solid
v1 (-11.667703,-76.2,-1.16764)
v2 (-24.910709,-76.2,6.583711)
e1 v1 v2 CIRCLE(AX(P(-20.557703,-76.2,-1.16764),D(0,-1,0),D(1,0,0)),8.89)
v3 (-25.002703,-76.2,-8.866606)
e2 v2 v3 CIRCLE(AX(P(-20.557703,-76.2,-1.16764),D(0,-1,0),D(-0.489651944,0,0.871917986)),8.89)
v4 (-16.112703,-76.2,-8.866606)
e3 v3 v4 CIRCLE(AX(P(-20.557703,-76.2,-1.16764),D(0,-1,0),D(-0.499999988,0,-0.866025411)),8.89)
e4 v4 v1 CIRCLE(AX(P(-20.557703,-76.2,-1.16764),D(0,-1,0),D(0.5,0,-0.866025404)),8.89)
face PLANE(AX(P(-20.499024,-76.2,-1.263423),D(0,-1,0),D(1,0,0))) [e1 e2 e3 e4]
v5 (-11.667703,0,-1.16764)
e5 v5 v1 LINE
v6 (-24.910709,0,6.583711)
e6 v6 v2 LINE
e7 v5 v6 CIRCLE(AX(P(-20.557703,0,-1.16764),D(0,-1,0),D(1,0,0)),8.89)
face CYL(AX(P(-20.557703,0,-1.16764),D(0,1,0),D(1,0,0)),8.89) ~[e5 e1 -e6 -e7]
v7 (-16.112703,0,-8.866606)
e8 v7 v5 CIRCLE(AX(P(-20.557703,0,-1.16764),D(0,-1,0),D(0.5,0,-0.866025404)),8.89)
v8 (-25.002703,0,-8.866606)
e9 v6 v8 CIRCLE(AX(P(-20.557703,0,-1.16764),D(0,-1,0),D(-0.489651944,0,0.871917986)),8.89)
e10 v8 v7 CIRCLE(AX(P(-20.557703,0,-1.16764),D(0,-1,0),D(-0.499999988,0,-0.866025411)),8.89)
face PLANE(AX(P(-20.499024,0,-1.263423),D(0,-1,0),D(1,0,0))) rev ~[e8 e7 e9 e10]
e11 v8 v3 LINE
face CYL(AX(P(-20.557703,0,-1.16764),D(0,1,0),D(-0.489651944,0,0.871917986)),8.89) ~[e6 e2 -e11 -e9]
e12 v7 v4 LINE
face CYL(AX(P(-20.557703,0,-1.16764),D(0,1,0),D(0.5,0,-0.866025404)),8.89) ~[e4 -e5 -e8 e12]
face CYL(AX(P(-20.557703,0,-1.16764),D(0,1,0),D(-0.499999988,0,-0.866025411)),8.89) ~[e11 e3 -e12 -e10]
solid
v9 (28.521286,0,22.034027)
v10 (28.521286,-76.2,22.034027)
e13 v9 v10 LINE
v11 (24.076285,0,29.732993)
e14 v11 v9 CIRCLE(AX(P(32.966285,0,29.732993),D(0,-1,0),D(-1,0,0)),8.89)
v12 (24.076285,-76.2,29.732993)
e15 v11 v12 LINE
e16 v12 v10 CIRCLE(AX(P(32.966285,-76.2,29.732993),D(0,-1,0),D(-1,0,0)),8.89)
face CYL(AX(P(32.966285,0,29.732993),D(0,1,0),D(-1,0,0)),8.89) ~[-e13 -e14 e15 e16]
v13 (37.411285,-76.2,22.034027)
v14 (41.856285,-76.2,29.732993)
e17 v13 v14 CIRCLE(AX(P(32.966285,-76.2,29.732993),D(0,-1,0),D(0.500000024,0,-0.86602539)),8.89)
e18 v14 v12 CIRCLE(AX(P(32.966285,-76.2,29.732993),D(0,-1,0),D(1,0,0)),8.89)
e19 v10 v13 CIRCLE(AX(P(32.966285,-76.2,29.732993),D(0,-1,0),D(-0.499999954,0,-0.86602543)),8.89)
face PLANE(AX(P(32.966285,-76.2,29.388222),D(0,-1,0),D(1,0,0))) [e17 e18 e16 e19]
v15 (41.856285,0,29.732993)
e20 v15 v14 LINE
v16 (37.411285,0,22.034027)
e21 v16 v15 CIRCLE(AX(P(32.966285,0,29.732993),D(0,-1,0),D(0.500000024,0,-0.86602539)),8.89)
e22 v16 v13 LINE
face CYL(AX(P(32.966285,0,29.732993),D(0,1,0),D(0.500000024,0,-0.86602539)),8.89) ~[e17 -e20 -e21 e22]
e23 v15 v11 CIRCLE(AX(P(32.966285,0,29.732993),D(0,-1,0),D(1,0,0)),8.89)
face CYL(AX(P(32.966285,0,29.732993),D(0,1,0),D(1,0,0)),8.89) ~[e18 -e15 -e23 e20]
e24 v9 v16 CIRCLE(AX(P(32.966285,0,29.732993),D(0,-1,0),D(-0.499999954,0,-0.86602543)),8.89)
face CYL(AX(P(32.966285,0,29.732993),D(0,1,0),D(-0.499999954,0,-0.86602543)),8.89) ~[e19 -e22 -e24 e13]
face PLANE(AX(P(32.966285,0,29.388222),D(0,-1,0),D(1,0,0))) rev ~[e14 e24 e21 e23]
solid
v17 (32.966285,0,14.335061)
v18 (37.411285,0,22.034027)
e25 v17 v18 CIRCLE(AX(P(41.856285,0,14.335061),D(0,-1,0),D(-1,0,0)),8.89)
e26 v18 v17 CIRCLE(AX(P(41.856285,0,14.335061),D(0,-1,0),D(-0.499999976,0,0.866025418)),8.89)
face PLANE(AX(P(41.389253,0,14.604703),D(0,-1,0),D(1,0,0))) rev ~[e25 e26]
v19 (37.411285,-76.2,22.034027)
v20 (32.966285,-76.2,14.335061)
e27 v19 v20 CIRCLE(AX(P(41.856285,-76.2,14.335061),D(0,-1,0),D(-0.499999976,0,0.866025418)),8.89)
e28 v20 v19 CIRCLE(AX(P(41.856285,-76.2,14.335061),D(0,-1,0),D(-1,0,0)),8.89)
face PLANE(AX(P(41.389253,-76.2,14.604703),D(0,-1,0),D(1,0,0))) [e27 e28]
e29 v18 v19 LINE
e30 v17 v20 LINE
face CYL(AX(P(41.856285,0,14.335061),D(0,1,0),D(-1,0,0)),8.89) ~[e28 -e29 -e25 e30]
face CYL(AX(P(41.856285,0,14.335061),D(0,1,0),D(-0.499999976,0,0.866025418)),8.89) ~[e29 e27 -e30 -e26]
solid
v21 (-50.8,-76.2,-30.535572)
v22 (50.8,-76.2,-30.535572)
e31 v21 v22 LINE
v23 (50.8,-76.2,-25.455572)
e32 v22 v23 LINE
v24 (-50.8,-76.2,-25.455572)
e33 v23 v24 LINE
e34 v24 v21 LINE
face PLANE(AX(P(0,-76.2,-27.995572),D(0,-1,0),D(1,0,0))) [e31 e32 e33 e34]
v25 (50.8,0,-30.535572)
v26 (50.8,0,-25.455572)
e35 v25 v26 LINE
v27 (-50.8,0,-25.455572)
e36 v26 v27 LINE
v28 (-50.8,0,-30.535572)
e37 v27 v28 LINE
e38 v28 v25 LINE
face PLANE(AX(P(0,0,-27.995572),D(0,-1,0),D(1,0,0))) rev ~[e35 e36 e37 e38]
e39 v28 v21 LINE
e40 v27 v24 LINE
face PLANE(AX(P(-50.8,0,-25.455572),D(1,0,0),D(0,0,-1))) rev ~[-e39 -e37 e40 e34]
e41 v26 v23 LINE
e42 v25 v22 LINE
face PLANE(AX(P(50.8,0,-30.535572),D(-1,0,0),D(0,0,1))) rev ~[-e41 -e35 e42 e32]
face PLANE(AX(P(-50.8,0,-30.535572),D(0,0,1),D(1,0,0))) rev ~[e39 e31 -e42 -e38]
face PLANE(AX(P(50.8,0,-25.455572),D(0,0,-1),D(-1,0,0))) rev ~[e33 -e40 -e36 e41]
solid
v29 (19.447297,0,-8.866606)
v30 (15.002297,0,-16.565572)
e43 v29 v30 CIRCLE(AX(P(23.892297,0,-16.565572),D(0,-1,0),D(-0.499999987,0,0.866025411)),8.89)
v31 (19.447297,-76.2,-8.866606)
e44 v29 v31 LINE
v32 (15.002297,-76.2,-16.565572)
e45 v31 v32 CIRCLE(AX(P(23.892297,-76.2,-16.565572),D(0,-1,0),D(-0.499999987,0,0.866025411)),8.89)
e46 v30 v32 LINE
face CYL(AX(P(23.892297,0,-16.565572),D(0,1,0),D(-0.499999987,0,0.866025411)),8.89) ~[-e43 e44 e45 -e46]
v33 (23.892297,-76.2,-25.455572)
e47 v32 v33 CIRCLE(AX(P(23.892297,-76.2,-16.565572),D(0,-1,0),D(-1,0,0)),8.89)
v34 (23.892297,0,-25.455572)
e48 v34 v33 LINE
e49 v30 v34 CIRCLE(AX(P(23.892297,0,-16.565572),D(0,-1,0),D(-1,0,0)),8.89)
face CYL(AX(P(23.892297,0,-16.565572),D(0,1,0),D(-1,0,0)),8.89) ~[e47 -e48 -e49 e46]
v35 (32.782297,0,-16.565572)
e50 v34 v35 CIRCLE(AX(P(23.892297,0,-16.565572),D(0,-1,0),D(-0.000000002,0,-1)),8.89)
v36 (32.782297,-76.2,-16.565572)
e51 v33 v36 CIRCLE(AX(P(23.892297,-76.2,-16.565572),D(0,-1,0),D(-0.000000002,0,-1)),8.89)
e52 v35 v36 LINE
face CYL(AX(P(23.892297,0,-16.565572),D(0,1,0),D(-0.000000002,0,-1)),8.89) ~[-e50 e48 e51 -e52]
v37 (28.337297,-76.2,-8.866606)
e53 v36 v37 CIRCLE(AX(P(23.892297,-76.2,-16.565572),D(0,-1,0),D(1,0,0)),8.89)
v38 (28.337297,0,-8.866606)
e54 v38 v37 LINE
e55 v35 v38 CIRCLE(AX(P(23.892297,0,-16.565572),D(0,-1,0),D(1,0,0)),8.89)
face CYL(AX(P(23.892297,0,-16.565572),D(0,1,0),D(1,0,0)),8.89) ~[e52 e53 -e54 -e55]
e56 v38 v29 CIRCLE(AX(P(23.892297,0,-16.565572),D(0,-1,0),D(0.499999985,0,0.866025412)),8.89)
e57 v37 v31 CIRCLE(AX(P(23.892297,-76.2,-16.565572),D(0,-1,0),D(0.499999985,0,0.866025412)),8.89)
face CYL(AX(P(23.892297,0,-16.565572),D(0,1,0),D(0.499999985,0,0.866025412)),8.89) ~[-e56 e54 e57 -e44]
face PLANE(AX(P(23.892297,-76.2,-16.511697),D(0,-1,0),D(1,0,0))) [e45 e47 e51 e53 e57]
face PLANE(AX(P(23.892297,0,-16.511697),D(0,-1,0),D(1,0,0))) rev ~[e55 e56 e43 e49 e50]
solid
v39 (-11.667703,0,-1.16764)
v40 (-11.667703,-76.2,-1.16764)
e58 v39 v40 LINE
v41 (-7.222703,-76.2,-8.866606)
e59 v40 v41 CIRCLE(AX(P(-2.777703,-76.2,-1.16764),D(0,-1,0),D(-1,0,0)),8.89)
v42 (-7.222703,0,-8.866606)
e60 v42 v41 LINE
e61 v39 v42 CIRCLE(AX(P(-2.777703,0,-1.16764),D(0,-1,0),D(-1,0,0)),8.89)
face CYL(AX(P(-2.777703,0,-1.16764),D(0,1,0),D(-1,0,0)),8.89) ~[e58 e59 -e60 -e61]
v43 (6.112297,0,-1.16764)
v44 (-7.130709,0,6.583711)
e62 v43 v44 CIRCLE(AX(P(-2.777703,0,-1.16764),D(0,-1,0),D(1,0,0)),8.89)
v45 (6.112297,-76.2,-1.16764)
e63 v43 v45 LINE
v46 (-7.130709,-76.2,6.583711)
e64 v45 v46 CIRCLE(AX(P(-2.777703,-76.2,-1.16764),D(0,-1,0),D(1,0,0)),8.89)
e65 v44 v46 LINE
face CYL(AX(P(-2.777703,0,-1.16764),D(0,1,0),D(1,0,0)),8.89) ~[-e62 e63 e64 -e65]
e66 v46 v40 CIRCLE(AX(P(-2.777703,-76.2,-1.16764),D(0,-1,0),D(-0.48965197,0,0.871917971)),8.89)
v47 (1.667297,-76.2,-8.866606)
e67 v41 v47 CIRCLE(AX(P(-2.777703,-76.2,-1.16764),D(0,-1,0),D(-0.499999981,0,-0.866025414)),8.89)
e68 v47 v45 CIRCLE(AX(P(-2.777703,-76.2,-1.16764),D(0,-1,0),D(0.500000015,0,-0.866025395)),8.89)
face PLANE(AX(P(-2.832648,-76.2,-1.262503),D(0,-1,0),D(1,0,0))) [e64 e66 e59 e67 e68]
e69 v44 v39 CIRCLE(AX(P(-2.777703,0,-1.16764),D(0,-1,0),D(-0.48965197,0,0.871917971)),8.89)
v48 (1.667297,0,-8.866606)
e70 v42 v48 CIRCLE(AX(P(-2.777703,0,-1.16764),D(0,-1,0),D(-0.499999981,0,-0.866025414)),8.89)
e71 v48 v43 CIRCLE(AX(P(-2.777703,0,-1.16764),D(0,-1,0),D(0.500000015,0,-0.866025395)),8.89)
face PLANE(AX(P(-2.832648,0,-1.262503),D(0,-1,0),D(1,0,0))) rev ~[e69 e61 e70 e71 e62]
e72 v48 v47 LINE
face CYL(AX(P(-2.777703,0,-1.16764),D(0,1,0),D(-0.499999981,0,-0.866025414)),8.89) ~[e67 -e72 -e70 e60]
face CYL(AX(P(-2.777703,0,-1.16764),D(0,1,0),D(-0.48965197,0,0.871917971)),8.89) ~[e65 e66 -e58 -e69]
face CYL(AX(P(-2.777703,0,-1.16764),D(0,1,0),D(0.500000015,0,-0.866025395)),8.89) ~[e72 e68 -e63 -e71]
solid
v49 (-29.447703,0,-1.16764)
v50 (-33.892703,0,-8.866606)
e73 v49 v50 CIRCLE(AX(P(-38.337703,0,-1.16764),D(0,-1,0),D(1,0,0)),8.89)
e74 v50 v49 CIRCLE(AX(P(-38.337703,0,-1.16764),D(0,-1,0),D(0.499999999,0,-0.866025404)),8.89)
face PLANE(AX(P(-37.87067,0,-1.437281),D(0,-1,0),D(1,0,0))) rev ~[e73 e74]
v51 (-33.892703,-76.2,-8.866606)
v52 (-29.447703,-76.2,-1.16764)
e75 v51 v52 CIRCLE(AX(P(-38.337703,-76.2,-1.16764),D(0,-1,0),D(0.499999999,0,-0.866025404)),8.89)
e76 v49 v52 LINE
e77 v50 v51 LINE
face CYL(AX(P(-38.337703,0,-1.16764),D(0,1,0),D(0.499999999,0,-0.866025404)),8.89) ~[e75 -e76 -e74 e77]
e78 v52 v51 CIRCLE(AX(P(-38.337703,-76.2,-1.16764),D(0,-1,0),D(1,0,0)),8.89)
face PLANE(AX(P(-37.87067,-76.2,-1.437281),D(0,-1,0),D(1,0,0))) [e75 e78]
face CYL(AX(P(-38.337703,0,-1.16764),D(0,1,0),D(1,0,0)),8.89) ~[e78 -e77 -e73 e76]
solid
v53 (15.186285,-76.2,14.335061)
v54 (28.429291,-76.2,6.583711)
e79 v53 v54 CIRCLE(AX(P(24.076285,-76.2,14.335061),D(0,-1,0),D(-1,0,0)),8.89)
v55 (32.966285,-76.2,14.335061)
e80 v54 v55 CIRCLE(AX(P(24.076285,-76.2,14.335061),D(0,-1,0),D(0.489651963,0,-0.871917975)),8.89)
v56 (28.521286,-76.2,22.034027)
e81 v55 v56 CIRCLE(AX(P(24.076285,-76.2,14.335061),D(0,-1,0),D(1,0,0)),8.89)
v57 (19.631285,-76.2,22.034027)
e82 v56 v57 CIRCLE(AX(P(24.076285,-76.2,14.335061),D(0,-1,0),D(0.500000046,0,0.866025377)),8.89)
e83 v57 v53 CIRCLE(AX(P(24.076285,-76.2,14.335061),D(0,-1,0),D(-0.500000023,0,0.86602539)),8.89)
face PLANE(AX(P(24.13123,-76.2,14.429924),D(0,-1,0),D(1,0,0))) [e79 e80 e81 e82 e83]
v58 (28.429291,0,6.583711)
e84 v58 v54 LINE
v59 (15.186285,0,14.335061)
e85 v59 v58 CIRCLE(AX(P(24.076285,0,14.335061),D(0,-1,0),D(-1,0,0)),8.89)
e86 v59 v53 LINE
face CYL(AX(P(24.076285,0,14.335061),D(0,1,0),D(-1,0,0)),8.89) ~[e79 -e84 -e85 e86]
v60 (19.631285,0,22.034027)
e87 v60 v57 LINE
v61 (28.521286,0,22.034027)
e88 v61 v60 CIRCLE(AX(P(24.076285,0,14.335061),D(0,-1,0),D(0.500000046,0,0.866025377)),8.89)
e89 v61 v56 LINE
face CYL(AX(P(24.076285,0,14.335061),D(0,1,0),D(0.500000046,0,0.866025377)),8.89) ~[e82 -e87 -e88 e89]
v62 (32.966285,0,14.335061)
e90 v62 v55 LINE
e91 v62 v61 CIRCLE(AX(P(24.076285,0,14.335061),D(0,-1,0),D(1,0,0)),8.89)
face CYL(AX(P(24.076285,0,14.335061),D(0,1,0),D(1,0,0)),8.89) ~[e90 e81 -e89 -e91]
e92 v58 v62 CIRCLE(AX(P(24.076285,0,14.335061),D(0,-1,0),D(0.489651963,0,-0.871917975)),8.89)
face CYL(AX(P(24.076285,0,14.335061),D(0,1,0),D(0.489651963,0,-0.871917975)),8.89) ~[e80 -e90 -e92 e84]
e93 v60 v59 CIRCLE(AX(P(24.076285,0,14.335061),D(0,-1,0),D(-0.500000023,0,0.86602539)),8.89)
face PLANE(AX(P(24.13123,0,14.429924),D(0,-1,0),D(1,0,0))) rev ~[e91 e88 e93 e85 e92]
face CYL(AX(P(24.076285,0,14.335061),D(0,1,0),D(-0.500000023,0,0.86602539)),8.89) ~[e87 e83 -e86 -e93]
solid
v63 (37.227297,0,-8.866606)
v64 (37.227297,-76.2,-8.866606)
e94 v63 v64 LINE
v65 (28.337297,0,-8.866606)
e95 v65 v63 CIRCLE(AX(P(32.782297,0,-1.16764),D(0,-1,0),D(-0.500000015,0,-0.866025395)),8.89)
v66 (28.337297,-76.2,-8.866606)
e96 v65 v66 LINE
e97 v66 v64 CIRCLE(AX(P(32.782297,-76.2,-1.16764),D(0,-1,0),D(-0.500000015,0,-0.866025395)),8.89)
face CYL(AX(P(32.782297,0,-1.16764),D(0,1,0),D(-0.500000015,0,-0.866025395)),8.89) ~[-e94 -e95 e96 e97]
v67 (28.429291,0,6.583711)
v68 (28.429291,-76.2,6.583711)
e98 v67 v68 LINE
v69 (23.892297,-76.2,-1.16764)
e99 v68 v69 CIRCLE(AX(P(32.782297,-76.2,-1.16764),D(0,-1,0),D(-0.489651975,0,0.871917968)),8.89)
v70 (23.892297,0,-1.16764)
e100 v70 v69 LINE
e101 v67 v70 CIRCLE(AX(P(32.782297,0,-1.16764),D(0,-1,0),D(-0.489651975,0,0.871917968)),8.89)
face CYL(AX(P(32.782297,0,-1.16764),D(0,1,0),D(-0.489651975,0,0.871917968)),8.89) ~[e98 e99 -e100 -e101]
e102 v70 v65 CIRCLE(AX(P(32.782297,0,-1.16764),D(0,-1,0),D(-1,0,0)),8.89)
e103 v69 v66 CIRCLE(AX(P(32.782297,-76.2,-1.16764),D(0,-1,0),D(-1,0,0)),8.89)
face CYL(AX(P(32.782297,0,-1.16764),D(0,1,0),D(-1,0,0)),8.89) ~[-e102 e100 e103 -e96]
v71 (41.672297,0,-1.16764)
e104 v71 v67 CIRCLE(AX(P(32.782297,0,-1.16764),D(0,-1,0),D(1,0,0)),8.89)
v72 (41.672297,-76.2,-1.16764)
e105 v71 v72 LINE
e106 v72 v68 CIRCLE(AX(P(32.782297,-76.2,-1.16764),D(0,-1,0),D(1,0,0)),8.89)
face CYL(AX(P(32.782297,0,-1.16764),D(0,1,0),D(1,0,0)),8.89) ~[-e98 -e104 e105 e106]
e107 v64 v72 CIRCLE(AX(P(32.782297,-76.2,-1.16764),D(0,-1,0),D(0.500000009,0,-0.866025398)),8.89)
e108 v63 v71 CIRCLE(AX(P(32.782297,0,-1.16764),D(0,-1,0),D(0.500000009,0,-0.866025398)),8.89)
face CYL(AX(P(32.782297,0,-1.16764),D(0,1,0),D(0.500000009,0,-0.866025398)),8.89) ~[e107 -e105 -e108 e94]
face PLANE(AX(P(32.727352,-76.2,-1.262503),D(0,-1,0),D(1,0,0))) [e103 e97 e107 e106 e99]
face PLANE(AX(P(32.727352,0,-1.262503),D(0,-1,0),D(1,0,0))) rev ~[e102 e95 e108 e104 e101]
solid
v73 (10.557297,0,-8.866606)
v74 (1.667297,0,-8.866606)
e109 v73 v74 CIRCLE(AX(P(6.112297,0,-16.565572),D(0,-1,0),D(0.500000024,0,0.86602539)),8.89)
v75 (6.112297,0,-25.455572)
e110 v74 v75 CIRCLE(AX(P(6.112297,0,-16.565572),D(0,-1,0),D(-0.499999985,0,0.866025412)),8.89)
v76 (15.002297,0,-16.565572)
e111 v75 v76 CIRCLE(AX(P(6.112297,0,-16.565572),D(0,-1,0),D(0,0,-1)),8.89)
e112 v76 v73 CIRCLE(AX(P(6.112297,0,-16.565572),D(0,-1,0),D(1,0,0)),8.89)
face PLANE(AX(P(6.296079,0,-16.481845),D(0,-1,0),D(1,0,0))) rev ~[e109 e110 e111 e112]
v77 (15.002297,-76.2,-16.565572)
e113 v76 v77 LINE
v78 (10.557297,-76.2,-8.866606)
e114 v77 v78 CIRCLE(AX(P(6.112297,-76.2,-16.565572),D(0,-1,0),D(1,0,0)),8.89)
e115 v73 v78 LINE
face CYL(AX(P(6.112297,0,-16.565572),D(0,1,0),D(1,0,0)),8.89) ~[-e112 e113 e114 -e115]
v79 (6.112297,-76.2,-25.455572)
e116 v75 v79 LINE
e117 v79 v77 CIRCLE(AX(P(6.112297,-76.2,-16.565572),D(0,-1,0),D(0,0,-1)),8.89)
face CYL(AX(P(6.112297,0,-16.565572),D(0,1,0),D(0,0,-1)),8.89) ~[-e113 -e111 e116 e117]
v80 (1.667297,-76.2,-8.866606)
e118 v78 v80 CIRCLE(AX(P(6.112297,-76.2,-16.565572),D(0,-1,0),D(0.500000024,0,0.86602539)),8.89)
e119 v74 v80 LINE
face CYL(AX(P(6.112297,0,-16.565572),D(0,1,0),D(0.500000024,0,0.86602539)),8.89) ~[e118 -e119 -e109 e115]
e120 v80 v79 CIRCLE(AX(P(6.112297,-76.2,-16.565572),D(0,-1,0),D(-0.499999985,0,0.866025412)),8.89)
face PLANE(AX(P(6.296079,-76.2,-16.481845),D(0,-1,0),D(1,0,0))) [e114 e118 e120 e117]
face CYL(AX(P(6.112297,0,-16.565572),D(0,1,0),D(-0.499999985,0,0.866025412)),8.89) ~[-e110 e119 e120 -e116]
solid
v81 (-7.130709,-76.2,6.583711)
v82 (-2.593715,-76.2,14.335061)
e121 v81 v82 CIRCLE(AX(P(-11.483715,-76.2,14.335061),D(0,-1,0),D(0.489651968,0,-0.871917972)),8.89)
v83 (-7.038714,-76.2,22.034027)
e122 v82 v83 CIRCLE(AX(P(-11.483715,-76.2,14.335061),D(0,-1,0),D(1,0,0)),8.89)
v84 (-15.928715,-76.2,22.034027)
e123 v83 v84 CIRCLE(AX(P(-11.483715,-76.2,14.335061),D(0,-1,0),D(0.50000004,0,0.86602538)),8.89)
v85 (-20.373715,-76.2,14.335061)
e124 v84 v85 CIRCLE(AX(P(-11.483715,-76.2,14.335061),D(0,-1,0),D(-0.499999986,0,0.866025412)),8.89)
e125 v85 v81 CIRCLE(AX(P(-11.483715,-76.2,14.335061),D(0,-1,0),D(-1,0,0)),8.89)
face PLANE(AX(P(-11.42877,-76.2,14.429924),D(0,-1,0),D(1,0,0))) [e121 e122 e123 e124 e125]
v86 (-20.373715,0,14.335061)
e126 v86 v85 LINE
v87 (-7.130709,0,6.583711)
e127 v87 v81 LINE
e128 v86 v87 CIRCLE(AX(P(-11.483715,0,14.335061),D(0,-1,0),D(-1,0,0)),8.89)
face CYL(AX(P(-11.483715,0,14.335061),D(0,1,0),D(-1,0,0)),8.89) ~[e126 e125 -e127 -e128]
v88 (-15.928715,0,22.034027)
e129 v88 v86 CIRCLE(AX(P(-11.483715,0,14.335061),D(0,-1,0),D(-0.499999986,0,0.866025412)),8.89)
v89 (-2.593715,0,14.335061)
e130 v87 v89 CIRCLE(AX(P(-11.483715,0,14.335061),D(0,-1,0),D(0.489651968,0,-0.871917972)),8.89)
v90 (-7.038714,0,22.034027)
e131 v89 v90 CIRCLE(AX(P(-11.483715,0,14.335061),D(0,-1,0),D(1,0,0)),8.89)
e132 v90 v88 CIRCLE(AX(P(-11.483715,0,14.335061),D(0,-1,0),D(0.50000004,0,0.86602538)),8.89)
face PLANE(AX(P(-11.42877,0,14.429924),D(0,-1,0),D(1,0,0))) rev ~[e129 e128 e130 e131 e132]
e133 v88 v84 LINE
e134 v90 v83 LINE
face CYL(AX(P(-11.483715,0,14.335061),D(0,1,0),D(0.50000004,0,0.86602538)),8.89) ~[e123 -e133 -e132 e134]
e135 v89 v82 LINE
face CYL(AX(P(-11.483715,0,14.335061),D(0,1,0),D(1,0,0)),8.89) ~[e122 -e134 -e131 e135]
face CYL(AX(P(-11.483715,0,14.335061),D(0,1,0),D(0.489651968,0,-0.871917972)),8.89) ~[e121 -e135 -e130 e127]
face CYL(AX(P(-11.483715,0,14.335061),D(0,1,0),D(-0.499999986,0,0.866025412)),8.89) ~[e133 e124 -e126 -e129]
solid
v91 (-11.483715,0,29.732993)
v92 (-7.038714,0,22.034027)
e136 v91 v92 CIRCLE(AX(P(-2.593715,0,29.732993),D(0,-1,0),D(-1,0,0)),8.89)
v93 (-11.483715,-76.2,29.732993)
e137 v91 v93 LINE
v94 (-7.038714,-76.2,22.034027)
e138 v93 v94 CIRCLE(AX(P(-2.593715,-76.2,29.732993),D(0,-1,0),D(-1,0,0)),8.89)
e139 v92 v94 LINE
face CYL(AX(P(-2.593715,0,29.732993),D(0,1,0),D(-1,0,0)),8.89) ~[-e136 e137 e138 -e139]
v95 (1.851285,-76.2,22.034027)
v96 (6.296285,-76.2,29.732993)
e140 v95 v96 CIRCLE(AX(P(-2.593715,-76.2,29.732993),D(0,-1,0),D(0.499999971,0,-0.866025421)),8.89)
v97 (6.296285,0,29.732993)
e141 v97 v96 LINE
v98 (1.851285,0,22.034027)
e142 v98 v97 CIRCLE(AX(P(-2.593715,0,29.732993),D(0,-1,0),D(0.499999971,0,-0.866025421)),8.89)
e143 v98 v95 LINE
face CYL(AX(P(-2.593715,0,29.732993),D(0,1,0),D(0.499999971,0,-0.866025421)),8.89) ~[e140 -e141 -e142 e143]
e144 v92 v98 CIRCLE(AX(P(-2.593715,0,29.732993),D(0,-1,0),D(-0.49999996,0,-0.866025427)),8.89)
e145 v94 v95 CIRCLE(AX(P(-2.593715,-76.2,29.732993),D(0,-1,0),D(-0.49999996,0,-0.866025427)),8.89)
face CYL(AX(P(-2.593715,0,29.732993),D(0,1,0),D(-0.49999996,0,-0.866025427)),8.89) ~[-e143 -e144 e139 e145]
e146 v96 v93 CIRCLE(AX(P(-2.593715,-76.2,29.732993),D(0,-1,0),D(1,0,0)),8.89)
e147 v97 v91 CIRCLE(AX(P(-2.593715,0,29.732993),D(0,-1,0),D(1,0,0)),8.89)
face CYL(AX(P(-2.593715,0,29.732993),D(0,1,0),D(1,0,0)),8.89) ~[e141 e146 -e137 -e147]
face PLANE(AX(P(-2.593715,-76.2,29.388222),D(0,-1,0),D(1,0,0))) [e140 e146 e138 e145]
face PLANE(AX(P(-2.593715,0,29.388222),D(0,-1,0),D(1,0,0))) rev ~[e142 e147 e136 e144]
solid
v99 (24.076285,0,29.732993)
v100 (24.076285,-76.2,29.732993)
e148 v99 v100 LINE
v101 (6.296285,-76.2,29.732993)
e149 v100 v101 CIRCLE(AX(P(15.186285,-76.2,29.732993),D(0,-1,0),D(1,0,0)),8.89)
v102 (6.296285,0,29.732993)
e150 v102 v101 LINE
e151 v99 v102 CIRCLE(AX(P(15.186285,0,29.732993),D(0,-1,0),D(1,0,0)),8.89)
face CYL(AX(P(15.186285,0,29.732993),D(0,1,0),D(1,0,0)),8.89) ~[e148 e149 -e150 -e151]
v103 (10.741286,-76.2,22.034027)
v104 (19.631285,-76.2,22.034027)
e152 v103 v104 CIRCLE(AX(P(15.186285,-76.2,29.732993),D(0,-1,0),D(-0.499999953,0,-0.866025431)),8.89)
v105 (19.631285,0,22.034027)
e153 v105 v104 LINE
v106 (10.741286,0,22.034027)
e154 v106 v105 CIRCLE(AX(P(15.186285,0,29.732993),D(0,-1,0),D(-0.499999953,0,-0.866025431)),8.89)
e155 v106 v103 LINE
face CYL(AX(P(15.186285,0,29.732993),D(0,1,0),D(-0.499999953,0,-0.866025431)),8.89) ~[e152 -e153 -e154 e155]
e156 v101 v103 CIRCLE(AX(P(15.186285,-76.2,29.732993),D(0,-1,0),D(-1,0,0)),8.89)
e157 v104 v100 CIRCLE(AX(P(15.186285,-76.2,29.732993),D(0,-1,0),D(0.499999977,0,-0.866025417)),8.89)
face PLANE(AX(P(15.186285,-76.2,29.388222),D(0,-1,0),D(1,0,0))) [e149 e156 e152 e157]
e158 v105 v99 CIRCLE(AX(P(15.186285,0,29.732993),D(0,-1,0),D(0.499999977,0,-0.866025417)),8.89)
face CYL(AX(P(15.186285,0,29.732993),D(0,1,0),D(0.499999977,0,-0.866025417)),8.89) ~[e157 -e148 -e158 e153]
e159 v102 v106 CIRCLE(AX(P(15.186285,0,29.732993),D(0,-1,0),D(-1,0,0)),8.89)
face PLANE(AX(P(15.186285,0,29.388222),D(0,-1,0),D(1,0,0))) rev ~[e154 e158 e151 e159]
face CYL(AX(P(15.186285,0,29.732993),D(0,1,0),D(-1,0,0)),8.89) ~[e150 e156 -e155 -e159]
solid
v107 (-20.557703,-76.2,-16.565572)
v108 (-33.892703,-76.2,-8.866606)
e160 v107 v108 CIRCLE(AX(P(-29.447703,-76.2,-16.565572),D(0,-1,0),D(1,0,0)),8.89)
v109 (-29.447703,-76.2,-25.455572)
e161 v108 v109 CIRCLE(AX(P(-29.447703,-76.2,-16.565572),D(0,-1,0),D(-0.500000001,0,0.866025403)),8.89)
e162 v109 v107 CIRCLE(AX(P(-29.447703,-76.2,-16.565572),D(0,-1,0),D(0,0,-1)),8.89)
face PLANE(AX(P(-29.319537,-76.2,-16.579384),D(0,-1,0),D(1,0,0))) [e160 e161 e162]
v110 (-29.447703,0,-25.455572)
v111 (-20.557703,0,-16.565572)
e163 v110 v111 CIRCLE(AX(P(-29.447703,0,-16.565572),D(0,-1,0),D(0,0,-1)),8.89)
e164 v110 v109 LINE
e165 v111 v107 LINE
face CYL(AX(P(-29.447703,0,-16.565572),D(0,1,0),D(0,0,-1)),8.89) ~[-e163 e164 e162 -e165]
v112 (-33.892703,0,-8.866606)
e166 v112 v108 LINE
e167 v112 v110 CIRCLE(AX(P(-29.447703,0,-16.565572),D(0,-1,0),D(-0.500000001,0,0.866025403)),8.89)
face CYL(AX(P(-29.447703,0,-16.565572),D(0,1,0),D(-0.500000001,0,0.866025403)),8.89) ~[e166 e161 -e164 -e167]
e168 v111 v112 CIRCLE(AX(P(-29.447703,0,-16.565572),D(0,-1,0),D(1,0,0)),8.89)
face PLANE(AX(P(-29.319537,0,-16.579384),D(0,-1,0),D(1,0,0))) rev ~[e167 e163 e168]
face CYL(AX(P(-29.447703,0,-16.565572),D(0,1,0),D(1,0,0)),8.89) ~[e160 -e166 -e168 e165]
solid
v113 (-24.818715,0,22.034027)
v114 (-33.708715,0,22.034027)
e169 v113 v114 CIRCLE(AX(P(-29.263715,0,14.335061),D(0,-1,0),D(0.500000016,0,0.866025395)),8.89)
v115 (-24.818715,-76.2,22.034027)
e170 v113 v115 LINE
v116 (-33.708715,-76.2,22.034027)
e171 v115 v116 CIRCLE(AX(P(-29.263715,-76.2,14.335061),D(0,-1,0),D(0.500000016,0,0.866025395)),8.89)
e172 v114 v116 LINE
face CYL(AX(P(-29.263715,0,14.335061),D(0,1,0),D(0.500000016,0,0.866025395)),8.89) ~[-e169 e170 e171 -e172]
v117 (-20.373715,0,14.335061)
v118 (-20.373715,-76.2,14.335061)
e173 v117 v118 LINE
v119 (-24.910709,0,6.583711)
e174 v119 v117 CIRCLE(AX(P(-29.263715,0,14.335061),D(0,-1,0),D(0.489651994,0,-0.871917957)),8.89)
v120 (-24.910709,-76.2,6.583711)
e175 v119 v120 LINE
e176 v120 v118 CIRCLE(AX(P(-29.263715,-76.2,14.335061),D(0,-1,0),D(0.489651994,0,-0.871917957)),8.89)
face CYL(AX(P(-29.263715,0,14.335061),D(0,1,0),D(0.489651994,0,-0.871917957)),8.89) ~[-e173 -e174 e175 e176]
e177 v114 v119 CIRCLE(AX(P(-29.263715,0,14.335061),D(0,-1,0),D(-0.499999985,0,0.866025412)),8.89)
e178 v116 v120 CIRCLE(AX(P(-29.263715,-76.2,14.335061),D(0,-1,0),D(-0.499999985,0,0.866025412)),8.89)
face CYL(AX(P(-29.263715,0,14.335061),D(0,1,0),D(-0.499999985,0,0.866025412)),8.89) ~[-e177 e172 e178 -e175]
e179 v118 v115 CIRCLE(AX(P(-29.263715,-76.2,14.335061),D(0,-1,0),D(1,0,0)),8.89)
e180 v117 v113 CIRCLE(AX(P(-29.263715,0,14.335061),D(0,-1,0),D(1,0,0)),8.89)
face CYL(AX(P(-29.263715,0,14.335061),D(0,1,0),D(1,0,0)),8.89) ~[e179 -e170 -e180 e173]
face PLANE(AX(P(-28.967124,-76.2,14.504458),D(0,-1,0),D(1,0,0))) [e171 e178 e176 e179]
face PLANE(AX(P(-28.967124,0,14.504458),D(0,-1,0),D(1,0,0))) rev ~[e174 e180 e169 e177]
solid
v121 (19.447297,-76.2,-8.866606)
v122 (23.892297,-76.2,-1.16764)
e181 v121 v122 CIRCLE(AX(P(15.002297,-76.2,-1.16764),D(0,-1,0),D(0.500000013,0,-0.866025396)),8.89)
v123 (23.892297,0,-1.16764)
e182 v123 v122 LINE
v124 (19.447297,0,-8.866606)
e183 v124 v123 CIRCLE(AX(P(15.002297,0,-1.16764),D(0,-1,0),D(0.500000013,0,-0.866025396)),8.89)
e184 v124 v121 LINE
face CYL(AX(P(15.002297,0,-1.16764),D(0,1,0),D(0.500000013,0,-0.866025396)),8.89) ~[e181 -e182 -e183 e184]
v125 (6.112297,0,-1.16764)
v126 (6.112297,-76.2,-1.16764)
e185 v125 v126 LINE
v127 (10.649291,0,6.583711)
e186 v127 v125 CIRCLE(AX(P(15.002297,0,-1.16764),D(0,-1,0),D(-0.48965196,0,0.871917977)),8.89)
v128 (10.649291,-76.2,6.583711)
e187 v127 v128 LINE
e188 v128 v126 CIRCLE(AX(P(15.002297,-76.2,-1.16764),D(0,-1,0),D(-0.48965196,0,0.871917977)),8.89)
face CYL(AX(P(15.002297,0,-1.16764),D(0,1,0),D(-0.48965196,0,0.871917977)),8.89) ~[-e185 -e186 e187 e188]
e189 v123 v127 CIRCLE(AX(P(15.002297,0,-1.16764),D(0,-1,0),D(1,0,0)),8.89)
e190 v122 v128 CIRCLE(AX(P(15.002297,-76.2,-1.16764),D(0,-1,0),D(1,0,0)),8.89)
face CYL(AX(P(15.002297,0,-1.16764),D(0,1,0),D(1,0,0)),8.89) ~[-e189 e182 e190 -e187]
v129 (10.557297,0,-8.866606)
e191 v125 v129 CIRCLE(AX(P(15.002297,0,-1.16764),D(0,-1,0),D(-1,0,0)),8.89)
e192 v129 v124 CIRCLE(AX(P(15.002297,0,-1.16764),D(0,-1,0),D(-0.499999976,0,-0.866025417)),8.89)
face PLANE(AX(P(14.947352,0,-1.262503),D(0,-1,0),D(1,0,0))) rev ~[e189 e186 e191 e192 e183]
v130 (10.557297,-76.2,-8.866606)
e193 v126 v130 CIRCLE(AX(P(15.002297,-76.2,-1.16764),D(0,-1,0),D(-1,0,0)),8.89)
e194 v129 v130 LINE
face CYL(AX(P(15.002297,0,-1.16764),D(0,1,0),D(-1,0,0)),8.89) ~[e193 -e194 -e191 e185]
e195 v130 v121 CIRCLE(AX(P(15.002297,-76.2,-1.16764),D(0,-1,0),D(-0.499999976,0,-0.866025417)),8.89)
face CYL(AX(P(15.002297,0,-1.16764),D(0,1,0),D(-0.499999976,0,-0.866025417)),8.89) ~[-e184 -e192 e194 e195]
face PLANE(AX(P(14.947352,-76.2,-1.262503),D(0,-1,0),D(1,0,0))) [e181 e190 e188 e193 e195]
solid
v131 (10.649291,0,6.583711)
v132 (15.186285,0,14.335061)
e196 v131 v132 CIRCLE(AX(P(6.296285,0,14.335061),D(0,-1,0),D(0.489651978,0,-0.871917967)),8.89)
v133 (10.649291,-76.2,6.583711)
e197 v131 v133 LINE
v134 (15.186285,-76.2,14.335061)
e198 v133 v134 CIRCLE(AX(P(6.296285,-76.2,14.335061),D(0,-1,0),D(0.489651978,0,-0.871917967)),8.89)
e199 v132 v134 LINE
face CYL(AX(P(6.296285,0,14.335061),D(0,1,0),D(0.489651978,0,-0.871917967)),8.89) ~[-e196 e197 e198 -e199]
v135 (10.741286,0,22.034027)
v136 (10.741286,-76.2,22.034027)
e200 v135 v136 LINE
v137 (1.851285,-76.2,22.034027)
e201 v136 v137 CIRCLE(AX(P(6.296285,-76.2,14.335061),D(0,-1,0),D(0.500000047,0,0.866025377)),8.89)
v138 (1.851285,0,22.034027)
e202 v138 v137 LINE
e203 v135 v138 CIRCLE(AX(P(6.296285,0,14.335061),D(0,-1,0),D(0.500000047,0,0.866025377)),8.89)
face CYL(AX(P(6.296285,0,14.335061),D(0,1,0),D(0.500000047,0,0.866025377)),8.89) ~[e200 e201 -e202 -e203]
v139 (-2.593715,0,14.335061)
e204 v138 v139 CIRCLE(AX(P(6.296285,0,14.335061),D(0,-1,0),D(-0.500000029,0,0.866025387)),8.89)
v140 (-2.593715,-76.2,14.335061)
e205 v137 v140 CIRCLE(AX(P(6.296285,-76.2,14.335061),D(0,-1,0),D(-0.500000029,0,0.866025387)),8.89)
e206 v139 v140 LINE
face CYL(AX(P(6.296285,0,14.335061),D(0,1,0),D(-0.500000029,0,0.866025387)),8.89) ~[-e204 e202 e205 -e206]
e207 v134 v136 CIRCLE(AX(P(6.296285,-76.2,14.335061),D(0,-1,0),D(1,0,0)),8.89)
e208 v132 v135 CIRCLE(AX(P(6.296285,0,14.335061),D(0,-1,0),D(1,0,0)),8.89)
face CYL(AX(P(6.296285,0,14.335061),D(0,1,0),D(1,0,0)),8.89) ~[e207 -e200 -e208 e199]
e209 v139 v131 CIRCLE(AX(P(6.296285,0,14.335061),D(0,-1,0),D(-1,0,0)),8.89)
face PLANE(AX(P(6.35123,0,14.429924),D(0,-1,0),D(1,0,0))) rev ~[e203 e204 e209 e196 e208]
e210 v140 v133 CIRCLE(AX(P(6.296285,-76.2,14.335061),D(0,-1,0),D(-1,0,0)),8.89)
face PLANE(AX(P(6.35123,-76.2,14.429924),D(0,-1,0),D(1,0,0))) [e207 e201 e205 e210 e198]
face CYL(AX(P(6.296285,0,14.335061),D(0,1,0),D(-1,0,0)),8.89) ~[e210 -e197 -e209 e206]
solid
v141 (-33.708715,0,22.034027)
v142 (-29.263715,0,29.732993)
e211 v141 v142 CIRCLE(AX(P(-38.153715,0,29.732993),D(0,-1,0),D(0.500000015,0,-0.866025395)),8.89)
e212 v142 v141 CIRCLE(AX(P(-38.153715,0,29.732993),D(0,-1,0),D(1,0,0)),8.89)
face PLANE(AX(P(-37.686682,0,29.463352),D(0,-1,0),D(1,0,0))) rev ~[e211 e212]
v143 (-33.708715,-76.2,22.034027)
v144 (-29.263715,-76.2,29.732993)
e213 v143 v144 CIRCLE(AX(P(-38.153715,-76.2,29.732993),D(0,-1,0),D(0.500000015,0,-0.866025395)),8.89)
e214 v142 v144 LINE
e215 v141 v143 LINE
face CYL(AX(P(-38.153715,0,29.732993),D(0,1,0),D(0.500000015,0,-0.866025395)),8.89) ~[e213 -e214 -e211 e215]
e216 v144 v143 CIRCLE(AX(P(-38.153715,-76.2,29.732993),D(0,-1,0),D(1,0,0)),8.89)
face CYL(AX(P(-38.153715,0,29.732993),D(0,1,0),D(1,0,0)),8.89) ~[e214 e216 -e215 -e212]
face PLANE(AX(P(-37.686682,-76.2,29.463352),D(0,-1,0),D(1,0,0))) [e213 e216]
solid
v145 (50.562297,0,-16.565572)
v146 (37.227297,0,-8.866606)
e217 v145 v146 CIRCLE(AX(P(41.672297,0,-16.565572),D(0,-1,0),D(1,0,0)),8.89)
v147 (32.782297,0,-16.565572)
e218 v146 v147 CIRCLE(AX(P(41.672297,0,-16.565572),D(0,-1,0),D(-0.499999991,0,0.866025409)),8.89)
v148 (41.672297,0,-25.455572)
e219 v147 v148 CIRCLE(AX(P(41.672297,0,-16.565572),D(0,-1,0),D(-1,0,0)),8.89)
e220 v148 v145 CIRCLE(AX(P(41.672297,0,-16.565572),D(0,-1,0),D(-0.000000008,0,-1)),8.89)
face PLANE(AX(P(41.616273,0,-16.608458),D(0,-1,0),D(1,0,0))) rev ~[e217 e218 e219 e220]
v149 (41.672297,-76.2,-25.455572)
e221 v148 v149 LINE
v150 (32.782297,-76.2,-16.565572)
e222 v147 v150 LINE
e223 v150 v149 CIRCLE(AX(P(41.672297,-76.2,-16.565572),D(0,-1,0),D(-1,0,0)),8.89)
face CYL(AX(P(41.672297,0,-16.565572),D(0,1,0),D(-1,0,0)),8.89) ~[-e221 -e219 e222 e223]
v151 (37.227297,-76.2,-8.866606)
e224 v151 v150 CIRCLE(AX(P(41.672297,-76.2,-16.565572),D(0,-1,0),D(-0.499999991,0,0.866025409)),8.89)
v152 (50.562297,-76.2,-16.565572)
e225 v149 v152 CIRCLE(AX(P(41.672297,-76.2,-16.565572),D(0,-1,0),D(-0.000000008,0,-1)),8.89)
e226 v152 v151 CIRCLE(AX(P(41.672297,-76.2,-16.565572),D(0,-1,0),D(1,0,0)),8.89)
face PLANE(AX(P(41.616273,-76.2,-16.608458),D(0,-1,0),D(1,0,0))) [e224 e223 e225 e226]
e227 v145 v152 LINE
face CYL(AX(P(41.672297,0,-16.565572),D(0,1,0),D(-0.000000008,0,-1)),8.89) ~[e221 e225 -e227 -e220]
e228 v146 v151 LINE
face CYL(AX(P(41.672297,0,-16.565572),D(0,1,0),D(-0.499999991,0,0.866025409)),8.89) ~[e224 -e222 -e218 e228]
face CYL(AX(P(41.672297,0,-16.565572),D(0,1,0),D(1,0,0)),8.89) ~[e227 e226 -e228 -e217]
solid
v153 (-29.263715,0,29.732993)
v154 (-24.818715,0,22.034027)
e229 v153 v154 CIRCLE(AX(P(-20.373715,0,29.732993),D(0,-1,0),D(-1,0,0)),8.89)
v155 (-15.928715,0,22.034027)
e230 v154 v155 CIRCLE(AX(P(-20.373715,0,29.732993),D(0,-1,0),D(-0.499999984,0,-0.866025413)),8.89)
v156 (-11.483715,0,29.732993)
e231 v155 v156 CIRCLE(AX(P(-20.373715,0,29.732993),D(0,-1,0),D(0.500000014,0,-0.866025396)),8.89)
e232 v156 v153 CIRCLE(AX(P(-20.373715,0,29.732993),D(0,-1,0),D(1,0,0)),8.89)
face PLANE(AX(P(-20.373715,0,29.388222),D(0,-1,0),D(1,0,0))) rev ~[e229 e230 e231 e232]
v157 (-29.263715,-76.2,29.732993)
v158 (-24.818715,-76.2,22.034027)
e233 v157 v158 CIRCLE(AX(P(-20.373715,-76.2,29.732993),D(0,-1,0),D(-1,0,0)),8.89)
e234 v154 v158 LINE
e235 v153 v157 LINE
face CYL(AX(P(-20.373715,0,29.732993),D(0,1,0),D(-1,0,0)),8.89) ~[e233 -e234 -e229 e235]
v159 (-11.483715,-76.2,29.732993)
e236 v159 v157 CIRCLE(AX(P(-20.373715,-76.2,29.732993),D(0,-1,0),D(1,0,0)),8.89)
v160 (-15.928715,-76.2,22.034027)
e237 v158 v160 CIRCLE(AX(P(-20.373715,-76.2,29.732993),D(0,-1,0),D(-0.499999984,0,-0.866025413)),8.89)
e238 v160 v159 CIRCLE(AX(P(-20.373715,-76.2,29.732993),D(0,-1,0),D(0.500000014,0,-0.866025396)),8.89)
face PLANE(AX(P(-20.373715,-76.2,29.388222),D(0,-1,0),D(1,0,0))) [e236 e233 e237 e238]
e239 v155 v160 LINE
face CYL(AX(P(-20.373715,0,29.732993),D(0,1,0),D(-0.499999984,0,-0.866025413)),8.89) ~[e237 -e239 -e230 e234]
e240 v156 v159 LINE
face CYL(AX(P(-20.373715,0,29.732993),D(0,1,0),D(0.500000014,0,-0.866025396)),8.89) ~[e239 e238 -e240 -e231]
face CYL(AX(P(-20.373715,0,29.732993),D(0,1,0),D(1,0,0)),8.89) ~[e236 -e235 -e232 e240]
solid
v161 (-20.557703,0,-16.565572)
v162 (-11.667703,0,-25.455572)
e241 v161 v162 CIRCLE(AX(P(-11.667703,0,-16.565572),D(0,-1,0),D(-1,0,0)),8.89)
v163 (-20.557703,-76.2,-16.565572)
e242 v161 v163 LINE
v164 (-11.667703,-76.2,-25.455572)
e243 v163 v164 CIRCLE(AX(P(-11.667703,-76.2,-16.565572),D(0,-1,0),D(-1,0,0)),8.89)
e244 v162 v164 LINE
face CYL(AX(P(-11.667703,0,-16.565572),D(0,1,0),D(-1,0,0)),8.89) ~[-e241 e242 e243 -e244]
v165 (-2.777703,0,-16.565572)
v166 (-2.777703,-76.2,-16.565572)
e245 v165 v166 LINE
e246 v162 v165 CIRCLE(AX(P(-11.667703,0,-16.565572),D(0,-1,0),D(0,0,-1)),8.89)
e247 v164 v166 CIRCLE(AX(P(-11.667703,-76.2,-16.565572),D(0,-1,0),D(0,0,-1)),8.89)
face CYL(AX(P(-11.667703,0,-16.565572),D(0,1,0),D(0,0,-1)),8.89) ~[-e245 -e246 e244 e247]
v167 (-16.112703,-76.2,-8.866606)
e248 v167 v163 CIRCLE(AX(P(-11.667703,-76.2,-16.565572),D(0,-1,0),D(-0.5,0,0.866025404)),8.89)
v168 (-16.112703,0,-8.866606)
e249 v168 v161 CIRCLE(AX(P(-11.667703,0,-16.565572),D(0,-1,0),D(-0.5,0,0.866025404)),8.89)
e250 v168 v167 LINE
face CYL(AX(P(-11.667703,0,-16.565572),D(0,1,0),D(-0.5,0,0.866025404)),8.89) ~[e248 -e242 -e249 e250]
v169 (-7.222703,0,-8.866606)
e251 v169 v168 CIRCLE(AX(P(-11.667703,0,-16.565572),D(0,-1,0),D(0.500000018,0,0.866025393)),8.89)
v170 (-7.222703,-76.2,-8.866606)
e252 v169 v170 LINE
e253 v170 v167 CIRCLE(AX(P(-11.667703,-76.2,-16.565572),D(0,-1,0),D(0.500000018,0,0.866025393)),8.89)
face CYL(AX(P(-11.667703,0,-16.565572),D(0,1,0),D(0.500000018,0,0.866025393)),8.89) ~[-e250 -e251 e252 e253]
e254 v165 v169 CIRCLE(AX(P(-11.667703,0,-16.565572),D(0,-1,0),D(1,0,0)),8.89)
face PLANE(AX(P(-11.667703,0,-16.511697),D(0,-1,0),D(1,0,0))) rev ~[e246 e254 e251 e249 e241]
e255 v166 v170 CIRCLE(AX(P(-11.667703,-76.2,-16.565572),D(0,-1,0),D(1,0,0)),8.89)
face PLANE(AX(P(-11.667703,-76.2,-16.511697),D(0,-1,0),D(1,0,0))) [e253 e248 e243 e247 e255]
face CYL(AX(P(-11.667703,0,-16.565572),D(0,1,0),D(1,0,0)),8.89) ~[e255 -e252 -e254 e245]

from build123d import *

# Parameters (mm, degrees)
F1_DEPTH = 76.2


# Not quite as in the source:
# - a feature names something its author has since deleted; it is built from what else it names


with BuildPart() as f1:
    # F0 (on Front) → F1 (new body)
    with BuildSketch(Plane.XZ):
        with BuildLine():
            ThreePointArc((-29.4477027383, -25.4555717693), (-23.1615234536, -22.851751054), (-20.5577027383, -16.5655717693))
            ThreePointArc((-20.5577027383, -16.5655717693), (-21.7487368667, -12.1205718246), (-25.0027026277, -8.8666059935))
            ThreePointArc((-25.0027026277, -8.8666059935), (-29.4477026803, -7.6755717693), (-33.8927027485, -8.8666059355))
            ThreePointArc((-33.8927027485, -8.8666059355), (-38.0347833325, -18.8664730859), (-29.4477027383, -25.4555717693))
        make_face()
    extrude(amount=F1_DEPTH)


with BuildPart() as f1b:
    # F0 (on Front) → F1, piece 2 (new body)
    with BuildSketch(Plane.XZ):
        with BuildLine():
            ThreePointArc((-16.1127027426, -8.8666059321), (-19.3666685792, -12.1205717714), (-20.5577027383, -16.5655717693))
            ThreePointArc((-20.5577027383, -16.5655717693), (-17.9538820218, -22.8517510553), (-11.6677027346, -25.4555717693))
            ThreePointArc((-11.6677027346, -25.4555717693), (-5.3815234523, -22.8517510527), (-2.7777027383, -16.5655717693))
            ThreePointArc((-2.7777027383, -16.5655717693), (-3.9687368512, -12.1205718515), (-7.2227025739, -8.8666060246))
            ThreePointArc((-7.2227025739, -8.8666060246), (-11.6677026458, -7.6755717693), (-16.1127027426, -8.8666059321))
        make_face()
    extrude(amount=F1_DEPTH)


with BuildPart() as f1c:
    # F0 (on Front) → F1, piece 3 (new body)
    with BuildSketch(Plane.XZ):
        with BuildLine():
            ThreePointArc((-29.4477027383, -1.16764009), (-28.256668546, -5.6126401453), (-25.0027026277, -8.8666059935))
            ThreePointArc((-25.0027026277, -8.8666059935), (-20.5577026769, -10.05764009), (-16.1127027426, -8.8666059321))
            ThreePointArc((-16.1127027426, -8.8666059321), (-12.8587368999, -5.6126400921), (-11.6677027383, -1.16764009))
            ThreePointArc((-11.6677027383, -1.16764009), (-16.0669411864, 6.5047233453), (-24.9107085164, 6.5837108049))
            ThreePointArc((-24.9107085164, 6.5837108049), (-28.2300661736, 3.323121462), (-29.4477027383, -1.16764009))
        make_face()
    extrude(amount=F1_DEPTH)


with BuildPart() as f1d:
    # F0 (on Front) → F1, piece 4 (new body)
    with BuildSketch(Plane.XZ):
        Polygon((-11.6677027346, -25.4555717693), (-29.4477027383, -25.4555717693), (-50.8, -25.4555717693), (-50.8, -30.5355717693), (50.8, -30.5355717693), (50.8, -25.4555717693), (41.6722971921, -25.4555717693), (23.8922972402, -25.4555717693), (6.1122972617, -25.4555717693), align=None)
    extrude(amount=F1_DEPTH)


with BuildPart() as f1e:
    # F0 (on Front) → F1, piece 5 (new body)
    with BuildSketch(Plane.XZ):
        with BuildLine():
            ThreePointArc((-29.4477027383, -1.16764009), (-46.036668575, 3.2773599151), (-33.8927027485, -8.8666059355))
            ThreePointArc((-33.8927027485, -8.8666059355), (-30.6387369016, -5.6126400951), (-29.4477027383, -1.16764009))
        make_face()
    extrude(amount=F1_DEPTH)


with BuildPart() as f1f:
    # F0 (on Front) → F1, piece 6 (new body)
    with BuildSketch(Plane.XZ):
        with BuildLine():
            ThreePointArc((-11.6677027383, -1.16764009), (-10.4766685305, -5.6126401722), (-7.2227025739, -8.8666060246))
            ThreePointArc((-7.2227025739, -8.8666060246), (-2.7777025673, -10.05764009), (1.6672973934, -8.8666058536))
            ThreePointArc((1.6672973934, -8.8666058536), (4.9212631394, -5.6126400241), (6.1122972617, -1.16764009))
            ThreePointArc((6.1122972617, -1.16764009), (1.7130586982, 6.5047234129), (-7.1307087496, 6.583710674))
            ThreePointArc((-7.1307087496, 6.583710674), (-10.4500662412, 3.3231213466), (-11.6677027383, -1.16764009))
        make_face()
    extrude(amount=F1_DEPTH)


with BuildPart() as f1g:
    # F0 (on Front) → F1, piece 7 (new body)
    with BuildSketch(Plane.XZ):
        with BuildLine():
            ThreePointArc((1.6672973934, -8.8666058536), (-1.5866685399, -12.1205717034), (-2.7777027383, -16.5655717693))
            ThreePointArc((-2.7777027383, -16.5655717693), (-0.1738820231, -22.851751054), (6.1122972617, -25.4555717693))
            ThreePointArc((6.1122972617, -25.4555717693), (12.3984765464, -22.851751054), (15.0022972617, -16.5655717693))
            ThreePointArc((15.0022972617, -16.5655717693), (13.8112631619, -12.1205718742), (10.5572974715, -8.8666060508))
            ThreePointArc((10.5572974715, -8.8666060508), (6.1122974589, -7.6755717693), (1.6672973934, -8.8666058536))
        make_face()
    extrude(amount=F1_DEPTH)


with BuildPart() as f1h:
    # F0 (on Front) → F1, piece 8 (new body)
    with BuildSketch(Plane.XZ):
        with BuildLine():
            ThreePointArc((-33.7087146145, 22.0340273618), (-36.9890099597, 9.935980421), (-24.9107085164, 6.5837108049))
            ThreePointArc((-24.9107085164, 6.5837108049), (-21.5913511801, 9.8443001178), (-20.3737147463, 14.3350614461))
            ThreePointArc((-20.3737147463, 14.3350614461), (-21.564748866, 18.7800613757), (-24.8187146054, 22.0340272044))
            ThreePointArc((-24.8187146054, 22.0340272044), (-29.2637145889, 23.2250614461), (-33.7087146145, 22.0340273618))
        make_face()
    extrude(amount=F1_DEPTH)


with BuildPart() as f1i:
    # F0 (on Front) → F1, piece 9 (new body)
    with BuildSketch(Plane.XZ):
        with BuildLine():
            ThreePointArc((-20.3737147463, 14.3350614461), (-15.97447619, 6.6626979475), (-7.1307087496, 6.583710674))
            ThreePointArc((-7.1307087496, 6.583710674), (-3.8113512476, 9.8443000024), (-2.5937147463, 14.3350614461))
            ThreePointArc((-2.5937147463, 14.3350614461), (-3.7847488029, 18.7800612665), (-7.0387143871, 22.0340270784))
            ThreePointArc((-7.0387143871, 22.0340270784), (-11.483714467, 23.2250614461), (-15.9287146218, 22.0340273576))
            ThreePointArc((-15.9287146218, 22.0340273576), (-19.18268055, 18.7800615083), (-20.3737147463, 14.3350614461))
        make_face()
    extrude(amount=F1_DEPTH)


with BuildPart() as f1j:
    # F0 (on Front) → F1, piece 10 (new body)
    with BuildSketch(Plane.XZ):
        with BuildLine():
            ThreePointArc((19.4472973755, -8.8666058639), (16.1933314549, -12.1205717124), (15.0022972617, -16.5655717693))
            ThreePointArc((15.0022972617, -16.5655717693), (17.6061179693, -22.8517510464), (23.8922972402, -25.4555717693))
            ThreePointArc((23.8922972402, -25.4555717693), (30.1784765388, -22.8517510616), (32.7822972617, -16.5655717693))
            ThreePointArc((32.7822972617, -16.5655717693), (31.5912630633, -12.1205717034), (28.3372971299, -8.8666058536))
            ThreePointArc((28.3372971299, -8.8666058536), (23.8922972513, -7.6755717693), (19.4472973755, -8.8666058639))
        make_face()
    extrude(amount=F1_DEPTH)


with BuildPart() as f1k:
    # F0 (on Front) → F1, piece 11 (new body)
    with BuildSketch(Plane.XZ):
        with BuildLine():
            ThreePointArc((-29.2637147463, 29.7329931254), (-45.852680624, 34.1779930595), (-33.7087146145, 22.0340273618))
            ThreePointArc((-33.7087146145, 22.0340273618), (-30.4547488686, 25.2879931913), (-29.2637147463, 29.7329931254))
        make_face()
    extrude(amount=F1_DEPTH)


with BuildPart() as f1l:
    # F0 (on Front) → F1, piece 12 (new body)
    with BuildSketch(Plane.XZ):
        with BuildLine():
            ThreePointArc((6.1122972617, -1.16764009), (7.3033314826, -5.6126401949), (10.5572974715, -8.8666060508))
            ThreePointArc((10.5572974715, -8.8666060508), (15.0022974485, -10.05764009), (19.4472973755, -8.8666058639))
            ThreePointArc((19.4472973755, -8.8666058639), (22.7012631342, -5.6126400331), (23.8922972617, -1.16764009))
            ThreePointArc((23.8922972617, -1.16764009), (19.4930587398, 6.5047233886), (10.6492913344, 6.5837107211))
            ThreePointArc((10.6492913344, 6.5837107211), (7.3299337831, 3.3231213881), (6.1122972617, -1.16764009))
        make_face()
    extrude(amount=F1_DEPTH)


with BuildPart() as f1m:
    # F0 (on Front) → F1, piece 13 (new body)
    with BuildSketch(Plane.XZ):
        with BuildLine():
            ThreePointArc((1.8512849925, 22.0340271349), (-1.4026806613, 18.7800613155), (-2.5937147463, 14.3350614461))
            ThreePointArc((-2.5937147463, 14.3350614461), (1.8055238515, 6.6626979231), (10.6492913344, 6.5837107211))
            ThreePointArc((10.6492913344, 6.5837107211), (13.9686487767, 9.8443000439), (15.1862852537, 14.3350614461))
            ThreePointArc((15.1862852537, 14.3350614461), (13.9952512129, 18.7800612391), (10.7412856677, 22.0340270467))
            ThreePointArc((10.7412856677, 22.0340270467), (6.2962853419, 23.2250614461), (1.8512849925, 22.0340271349))
        make_face()
    extrude(amount=F1_DEPTH)


with BuildPart() as f1n:
    # F0 (on Front) → F1, piece 14 (new body)
    with BuildSketch(Plane.XZ):
        with BuildLine():
            ThreePointArc((37.2272973436, -8.8666058823), (33.9733314457, -12.1205717283), (32.7822972617, -16.5655717693))
            ThreePointArc((32.7822972617, -16.5655717693), (35.3861179524, -22.8517510294), (41.6722971921, -25.4555717693))
            ThreePointArc((41.6722971921, -25.4555717693), (47.9584765218, -22.8517510786), (50.5622972617, -16.5655717693))
            ThreePointArc((50.5622972617, -16.5655717693), (46.1172973026, -8.8666059533), (37.2272973436, -8.8666058823))
        make_face()
    extrude(amount=F1_DEPTH)


with BuildPart() as f1o:
    # F0 (on Front) → F1, piece 15 (new body)
    with BuildSketch(Plane.XZ):
        with BuildLine():
            ThreePointArc((-29.2637147463, 29.7329931254), (-28.0726805453, 25.2879930549), (-24.8187146054, 22.0340272044))
            ThreePointArc((-24.8187146054, 22.0340272044), (-20.3737145931, 20.8429931254), (-15.9287146218, 22.0340273576))
            ThreePointArc((-15.9287146218, 22.0340273576), (-12.6747488707, 25.2879931876), (-11.4837147463, 29.7329931254))
            ThreePointArc((-11.4837147463, 29.7329931254), (-20.3737147463, 38.6229931254), (-29.2637147463, 29.7329931254))
        make_face()
    extrude(amount=F1_DEPTH)


with BuildPart() as f1p:
    # F0 (on Front) → F1, piece 16 (new body)
    with BuildSketch(Plane.XZ):
        with BuildLine():
            ThreePointArc((-11.4837147463, 29.7329931254), (-10.2926804822, 25.2879929458), (-7.0387143871, 22.0340270784))
            ThreePointArc((-7.0387143871, 22.0340270784), (-2.5937146897, 20.8429931254), (1.8512849925, 22.0340271349))
            ThreePointArc((1.8512849925, 22.0340271349), (5.1052510179, 25.2879929948), (6.2962852537, 29.7329931254))
            ThreePointArc((6.2962852537, 29.7329931254), (-2.5937147463, 38.6229931254), (-11.4837147463, 29.7329931254))
        make_face()
    extrude(amount=F1_DEPTH)


with BuildPart() as f1q:
    # F0 (on Front) → F1, piece 17 (new body)
    with BuildSketch(Plane.XZ):
        with BuildLine():
            ThreePointArc((23.8922972617, -1.16764009), (25.083331384, -5.6126400241), (28.3372971299, -8.8666058536))
            ThreePointArc((28.3372971299, -8.8666058536), (32.7822972329, -10.05764009), (37.2272973436, -8.8666058823))
            ThreePointArc((37.2272973436, -8.8666058823), (40.481263125, -5.612640049), (41.6722972617, -1.16764009))
            ThreePointArc((41.6722972617, -1.16764009), (37.2730586761, 6.5047234258), (28.4292912057, 6.5837106489))
            ThreePointArc((28.4292912057, 6.5837106489), (25.1099337459, 3.3231213244), (23.8922972617, -1.16764009))
        make_face()
    extrude(amount=F1_DEPTH)


with BuildPart() as f1r:
    # F0 (on Front) → F1, piece 18 (new body)
    with BuildSketch(Plane.XZ):
        with BuildLine():
            ThreePointArc((19.6312850473, 22.0340271665), (16.3773193545, 18.7800613429), (15.1862852537, 14.3350614461))
            ThreePointArc((15.1862852537, 14.3350614461), (19.5855237879, 6.6626979604), (28.4292912057, 6.5837106489))
            ThreePointArc((28.4292912057, 6.5837106489), (31.7486487394, 9.8442999802), (32.9662852537, 14.3350614461))
            ThreePointArc((32.9662852537, 14.3350614461), (31.7752512108, 18.7800612428), (28.5212856604, 22.034027051))
            ThreePointArc((28.5212856604, 22.034027051), (24.0762853693, 23.2250614461), (19.6312850473, 22.0340271665))
        make_face()
    extrude(amount=F1_DEPTH)


with BuildPart() as f1s:
    # F0 (on Front) → F1, piece 19 (new body)
    with BuildSketch(Plane.XZ):
        with BuildLine():
            ThreePointArc((6.2962852537, 29.7329931254), (7.4873195336, 25.2879929184), (10.7412856677, 22.0340270467))
            ThreePointArc((10.7412856677, 22.0340270467), (15.1862853735, 20.8429931254), (19.6312850473, 22.0340271665))
            ThreePointArc((19.6312850473, 22.0340271665), (22.8852510338, 25.2879930222), (24.0762852537, 29.7329931254))
            ThreePointArc((24.0762852537, 29.7329931254), (15.1862852537, 38.6229931254), (6.2962852537, 29.7329931254))
        make_face()
    extrude(amount=F1_DEPTH)


with BuildPart() as f1t:
    # F0 (on Front) → F1, piece 20 (new body)
    with BuildSketch(Plane.XZ):
        with BuildLine():
            ThreePointArc((41.8562852537, 29.7329931254), (32.9662852537, 38.6229931254), (24.0762852537, 29.7329931254))
            ThreePointArc((24.0762852537, 29.7329931254), (25.2673195315, 25.2879929221), (28.5212856604, 22.034027051))
            ThreePointArc((28.5212856604, 22.034027051), (32.9662856111, 20.8429931254), (37.4112854661, 22.0340274083))
            ThreePointArc((37.4112854661, 22.0340274083), (40.6652511547, 25.2879932316), (41.8562852537, 29.7329931254))
        make_face()
    extrude(amount=F1_DEPTH)


with BuildPart() as f1u:
    # F0 (on Front) → F1, piece 21 (new body)
    with BuildSketch(Plane.XZ):
        with BuildLine():
            ThreePointArc((37.4112854661, 22.0340274083), (34.1573194754, 18.7800615523), (32.9662852537, 14.3350614461))
            ThreePointArc((32.9662852537, 14.3350614461), (41.8562852537, 5.4450614461), (50.7462852537, 14.3350614461))
            ThreePointArc((50.7462852537, 14.3350614461), (46.3012853599, 22.0340272244), (37.4112854661, 22.0340274083))
        make_face()
    extrude(amount=F1_DEPTH)


solid = Compound([f1.part, f1b.part, f1c.part, f1d.part, f1e.part, f1f.part, f1g.part, f1h.part, f1i.part, f1j.part, f1k.part, f1l.part, f1m.part, f1n.part, f1o.part, f1p.part, f1q.part, f1r.part, f1s.part, f1t.part, f1u.part])
